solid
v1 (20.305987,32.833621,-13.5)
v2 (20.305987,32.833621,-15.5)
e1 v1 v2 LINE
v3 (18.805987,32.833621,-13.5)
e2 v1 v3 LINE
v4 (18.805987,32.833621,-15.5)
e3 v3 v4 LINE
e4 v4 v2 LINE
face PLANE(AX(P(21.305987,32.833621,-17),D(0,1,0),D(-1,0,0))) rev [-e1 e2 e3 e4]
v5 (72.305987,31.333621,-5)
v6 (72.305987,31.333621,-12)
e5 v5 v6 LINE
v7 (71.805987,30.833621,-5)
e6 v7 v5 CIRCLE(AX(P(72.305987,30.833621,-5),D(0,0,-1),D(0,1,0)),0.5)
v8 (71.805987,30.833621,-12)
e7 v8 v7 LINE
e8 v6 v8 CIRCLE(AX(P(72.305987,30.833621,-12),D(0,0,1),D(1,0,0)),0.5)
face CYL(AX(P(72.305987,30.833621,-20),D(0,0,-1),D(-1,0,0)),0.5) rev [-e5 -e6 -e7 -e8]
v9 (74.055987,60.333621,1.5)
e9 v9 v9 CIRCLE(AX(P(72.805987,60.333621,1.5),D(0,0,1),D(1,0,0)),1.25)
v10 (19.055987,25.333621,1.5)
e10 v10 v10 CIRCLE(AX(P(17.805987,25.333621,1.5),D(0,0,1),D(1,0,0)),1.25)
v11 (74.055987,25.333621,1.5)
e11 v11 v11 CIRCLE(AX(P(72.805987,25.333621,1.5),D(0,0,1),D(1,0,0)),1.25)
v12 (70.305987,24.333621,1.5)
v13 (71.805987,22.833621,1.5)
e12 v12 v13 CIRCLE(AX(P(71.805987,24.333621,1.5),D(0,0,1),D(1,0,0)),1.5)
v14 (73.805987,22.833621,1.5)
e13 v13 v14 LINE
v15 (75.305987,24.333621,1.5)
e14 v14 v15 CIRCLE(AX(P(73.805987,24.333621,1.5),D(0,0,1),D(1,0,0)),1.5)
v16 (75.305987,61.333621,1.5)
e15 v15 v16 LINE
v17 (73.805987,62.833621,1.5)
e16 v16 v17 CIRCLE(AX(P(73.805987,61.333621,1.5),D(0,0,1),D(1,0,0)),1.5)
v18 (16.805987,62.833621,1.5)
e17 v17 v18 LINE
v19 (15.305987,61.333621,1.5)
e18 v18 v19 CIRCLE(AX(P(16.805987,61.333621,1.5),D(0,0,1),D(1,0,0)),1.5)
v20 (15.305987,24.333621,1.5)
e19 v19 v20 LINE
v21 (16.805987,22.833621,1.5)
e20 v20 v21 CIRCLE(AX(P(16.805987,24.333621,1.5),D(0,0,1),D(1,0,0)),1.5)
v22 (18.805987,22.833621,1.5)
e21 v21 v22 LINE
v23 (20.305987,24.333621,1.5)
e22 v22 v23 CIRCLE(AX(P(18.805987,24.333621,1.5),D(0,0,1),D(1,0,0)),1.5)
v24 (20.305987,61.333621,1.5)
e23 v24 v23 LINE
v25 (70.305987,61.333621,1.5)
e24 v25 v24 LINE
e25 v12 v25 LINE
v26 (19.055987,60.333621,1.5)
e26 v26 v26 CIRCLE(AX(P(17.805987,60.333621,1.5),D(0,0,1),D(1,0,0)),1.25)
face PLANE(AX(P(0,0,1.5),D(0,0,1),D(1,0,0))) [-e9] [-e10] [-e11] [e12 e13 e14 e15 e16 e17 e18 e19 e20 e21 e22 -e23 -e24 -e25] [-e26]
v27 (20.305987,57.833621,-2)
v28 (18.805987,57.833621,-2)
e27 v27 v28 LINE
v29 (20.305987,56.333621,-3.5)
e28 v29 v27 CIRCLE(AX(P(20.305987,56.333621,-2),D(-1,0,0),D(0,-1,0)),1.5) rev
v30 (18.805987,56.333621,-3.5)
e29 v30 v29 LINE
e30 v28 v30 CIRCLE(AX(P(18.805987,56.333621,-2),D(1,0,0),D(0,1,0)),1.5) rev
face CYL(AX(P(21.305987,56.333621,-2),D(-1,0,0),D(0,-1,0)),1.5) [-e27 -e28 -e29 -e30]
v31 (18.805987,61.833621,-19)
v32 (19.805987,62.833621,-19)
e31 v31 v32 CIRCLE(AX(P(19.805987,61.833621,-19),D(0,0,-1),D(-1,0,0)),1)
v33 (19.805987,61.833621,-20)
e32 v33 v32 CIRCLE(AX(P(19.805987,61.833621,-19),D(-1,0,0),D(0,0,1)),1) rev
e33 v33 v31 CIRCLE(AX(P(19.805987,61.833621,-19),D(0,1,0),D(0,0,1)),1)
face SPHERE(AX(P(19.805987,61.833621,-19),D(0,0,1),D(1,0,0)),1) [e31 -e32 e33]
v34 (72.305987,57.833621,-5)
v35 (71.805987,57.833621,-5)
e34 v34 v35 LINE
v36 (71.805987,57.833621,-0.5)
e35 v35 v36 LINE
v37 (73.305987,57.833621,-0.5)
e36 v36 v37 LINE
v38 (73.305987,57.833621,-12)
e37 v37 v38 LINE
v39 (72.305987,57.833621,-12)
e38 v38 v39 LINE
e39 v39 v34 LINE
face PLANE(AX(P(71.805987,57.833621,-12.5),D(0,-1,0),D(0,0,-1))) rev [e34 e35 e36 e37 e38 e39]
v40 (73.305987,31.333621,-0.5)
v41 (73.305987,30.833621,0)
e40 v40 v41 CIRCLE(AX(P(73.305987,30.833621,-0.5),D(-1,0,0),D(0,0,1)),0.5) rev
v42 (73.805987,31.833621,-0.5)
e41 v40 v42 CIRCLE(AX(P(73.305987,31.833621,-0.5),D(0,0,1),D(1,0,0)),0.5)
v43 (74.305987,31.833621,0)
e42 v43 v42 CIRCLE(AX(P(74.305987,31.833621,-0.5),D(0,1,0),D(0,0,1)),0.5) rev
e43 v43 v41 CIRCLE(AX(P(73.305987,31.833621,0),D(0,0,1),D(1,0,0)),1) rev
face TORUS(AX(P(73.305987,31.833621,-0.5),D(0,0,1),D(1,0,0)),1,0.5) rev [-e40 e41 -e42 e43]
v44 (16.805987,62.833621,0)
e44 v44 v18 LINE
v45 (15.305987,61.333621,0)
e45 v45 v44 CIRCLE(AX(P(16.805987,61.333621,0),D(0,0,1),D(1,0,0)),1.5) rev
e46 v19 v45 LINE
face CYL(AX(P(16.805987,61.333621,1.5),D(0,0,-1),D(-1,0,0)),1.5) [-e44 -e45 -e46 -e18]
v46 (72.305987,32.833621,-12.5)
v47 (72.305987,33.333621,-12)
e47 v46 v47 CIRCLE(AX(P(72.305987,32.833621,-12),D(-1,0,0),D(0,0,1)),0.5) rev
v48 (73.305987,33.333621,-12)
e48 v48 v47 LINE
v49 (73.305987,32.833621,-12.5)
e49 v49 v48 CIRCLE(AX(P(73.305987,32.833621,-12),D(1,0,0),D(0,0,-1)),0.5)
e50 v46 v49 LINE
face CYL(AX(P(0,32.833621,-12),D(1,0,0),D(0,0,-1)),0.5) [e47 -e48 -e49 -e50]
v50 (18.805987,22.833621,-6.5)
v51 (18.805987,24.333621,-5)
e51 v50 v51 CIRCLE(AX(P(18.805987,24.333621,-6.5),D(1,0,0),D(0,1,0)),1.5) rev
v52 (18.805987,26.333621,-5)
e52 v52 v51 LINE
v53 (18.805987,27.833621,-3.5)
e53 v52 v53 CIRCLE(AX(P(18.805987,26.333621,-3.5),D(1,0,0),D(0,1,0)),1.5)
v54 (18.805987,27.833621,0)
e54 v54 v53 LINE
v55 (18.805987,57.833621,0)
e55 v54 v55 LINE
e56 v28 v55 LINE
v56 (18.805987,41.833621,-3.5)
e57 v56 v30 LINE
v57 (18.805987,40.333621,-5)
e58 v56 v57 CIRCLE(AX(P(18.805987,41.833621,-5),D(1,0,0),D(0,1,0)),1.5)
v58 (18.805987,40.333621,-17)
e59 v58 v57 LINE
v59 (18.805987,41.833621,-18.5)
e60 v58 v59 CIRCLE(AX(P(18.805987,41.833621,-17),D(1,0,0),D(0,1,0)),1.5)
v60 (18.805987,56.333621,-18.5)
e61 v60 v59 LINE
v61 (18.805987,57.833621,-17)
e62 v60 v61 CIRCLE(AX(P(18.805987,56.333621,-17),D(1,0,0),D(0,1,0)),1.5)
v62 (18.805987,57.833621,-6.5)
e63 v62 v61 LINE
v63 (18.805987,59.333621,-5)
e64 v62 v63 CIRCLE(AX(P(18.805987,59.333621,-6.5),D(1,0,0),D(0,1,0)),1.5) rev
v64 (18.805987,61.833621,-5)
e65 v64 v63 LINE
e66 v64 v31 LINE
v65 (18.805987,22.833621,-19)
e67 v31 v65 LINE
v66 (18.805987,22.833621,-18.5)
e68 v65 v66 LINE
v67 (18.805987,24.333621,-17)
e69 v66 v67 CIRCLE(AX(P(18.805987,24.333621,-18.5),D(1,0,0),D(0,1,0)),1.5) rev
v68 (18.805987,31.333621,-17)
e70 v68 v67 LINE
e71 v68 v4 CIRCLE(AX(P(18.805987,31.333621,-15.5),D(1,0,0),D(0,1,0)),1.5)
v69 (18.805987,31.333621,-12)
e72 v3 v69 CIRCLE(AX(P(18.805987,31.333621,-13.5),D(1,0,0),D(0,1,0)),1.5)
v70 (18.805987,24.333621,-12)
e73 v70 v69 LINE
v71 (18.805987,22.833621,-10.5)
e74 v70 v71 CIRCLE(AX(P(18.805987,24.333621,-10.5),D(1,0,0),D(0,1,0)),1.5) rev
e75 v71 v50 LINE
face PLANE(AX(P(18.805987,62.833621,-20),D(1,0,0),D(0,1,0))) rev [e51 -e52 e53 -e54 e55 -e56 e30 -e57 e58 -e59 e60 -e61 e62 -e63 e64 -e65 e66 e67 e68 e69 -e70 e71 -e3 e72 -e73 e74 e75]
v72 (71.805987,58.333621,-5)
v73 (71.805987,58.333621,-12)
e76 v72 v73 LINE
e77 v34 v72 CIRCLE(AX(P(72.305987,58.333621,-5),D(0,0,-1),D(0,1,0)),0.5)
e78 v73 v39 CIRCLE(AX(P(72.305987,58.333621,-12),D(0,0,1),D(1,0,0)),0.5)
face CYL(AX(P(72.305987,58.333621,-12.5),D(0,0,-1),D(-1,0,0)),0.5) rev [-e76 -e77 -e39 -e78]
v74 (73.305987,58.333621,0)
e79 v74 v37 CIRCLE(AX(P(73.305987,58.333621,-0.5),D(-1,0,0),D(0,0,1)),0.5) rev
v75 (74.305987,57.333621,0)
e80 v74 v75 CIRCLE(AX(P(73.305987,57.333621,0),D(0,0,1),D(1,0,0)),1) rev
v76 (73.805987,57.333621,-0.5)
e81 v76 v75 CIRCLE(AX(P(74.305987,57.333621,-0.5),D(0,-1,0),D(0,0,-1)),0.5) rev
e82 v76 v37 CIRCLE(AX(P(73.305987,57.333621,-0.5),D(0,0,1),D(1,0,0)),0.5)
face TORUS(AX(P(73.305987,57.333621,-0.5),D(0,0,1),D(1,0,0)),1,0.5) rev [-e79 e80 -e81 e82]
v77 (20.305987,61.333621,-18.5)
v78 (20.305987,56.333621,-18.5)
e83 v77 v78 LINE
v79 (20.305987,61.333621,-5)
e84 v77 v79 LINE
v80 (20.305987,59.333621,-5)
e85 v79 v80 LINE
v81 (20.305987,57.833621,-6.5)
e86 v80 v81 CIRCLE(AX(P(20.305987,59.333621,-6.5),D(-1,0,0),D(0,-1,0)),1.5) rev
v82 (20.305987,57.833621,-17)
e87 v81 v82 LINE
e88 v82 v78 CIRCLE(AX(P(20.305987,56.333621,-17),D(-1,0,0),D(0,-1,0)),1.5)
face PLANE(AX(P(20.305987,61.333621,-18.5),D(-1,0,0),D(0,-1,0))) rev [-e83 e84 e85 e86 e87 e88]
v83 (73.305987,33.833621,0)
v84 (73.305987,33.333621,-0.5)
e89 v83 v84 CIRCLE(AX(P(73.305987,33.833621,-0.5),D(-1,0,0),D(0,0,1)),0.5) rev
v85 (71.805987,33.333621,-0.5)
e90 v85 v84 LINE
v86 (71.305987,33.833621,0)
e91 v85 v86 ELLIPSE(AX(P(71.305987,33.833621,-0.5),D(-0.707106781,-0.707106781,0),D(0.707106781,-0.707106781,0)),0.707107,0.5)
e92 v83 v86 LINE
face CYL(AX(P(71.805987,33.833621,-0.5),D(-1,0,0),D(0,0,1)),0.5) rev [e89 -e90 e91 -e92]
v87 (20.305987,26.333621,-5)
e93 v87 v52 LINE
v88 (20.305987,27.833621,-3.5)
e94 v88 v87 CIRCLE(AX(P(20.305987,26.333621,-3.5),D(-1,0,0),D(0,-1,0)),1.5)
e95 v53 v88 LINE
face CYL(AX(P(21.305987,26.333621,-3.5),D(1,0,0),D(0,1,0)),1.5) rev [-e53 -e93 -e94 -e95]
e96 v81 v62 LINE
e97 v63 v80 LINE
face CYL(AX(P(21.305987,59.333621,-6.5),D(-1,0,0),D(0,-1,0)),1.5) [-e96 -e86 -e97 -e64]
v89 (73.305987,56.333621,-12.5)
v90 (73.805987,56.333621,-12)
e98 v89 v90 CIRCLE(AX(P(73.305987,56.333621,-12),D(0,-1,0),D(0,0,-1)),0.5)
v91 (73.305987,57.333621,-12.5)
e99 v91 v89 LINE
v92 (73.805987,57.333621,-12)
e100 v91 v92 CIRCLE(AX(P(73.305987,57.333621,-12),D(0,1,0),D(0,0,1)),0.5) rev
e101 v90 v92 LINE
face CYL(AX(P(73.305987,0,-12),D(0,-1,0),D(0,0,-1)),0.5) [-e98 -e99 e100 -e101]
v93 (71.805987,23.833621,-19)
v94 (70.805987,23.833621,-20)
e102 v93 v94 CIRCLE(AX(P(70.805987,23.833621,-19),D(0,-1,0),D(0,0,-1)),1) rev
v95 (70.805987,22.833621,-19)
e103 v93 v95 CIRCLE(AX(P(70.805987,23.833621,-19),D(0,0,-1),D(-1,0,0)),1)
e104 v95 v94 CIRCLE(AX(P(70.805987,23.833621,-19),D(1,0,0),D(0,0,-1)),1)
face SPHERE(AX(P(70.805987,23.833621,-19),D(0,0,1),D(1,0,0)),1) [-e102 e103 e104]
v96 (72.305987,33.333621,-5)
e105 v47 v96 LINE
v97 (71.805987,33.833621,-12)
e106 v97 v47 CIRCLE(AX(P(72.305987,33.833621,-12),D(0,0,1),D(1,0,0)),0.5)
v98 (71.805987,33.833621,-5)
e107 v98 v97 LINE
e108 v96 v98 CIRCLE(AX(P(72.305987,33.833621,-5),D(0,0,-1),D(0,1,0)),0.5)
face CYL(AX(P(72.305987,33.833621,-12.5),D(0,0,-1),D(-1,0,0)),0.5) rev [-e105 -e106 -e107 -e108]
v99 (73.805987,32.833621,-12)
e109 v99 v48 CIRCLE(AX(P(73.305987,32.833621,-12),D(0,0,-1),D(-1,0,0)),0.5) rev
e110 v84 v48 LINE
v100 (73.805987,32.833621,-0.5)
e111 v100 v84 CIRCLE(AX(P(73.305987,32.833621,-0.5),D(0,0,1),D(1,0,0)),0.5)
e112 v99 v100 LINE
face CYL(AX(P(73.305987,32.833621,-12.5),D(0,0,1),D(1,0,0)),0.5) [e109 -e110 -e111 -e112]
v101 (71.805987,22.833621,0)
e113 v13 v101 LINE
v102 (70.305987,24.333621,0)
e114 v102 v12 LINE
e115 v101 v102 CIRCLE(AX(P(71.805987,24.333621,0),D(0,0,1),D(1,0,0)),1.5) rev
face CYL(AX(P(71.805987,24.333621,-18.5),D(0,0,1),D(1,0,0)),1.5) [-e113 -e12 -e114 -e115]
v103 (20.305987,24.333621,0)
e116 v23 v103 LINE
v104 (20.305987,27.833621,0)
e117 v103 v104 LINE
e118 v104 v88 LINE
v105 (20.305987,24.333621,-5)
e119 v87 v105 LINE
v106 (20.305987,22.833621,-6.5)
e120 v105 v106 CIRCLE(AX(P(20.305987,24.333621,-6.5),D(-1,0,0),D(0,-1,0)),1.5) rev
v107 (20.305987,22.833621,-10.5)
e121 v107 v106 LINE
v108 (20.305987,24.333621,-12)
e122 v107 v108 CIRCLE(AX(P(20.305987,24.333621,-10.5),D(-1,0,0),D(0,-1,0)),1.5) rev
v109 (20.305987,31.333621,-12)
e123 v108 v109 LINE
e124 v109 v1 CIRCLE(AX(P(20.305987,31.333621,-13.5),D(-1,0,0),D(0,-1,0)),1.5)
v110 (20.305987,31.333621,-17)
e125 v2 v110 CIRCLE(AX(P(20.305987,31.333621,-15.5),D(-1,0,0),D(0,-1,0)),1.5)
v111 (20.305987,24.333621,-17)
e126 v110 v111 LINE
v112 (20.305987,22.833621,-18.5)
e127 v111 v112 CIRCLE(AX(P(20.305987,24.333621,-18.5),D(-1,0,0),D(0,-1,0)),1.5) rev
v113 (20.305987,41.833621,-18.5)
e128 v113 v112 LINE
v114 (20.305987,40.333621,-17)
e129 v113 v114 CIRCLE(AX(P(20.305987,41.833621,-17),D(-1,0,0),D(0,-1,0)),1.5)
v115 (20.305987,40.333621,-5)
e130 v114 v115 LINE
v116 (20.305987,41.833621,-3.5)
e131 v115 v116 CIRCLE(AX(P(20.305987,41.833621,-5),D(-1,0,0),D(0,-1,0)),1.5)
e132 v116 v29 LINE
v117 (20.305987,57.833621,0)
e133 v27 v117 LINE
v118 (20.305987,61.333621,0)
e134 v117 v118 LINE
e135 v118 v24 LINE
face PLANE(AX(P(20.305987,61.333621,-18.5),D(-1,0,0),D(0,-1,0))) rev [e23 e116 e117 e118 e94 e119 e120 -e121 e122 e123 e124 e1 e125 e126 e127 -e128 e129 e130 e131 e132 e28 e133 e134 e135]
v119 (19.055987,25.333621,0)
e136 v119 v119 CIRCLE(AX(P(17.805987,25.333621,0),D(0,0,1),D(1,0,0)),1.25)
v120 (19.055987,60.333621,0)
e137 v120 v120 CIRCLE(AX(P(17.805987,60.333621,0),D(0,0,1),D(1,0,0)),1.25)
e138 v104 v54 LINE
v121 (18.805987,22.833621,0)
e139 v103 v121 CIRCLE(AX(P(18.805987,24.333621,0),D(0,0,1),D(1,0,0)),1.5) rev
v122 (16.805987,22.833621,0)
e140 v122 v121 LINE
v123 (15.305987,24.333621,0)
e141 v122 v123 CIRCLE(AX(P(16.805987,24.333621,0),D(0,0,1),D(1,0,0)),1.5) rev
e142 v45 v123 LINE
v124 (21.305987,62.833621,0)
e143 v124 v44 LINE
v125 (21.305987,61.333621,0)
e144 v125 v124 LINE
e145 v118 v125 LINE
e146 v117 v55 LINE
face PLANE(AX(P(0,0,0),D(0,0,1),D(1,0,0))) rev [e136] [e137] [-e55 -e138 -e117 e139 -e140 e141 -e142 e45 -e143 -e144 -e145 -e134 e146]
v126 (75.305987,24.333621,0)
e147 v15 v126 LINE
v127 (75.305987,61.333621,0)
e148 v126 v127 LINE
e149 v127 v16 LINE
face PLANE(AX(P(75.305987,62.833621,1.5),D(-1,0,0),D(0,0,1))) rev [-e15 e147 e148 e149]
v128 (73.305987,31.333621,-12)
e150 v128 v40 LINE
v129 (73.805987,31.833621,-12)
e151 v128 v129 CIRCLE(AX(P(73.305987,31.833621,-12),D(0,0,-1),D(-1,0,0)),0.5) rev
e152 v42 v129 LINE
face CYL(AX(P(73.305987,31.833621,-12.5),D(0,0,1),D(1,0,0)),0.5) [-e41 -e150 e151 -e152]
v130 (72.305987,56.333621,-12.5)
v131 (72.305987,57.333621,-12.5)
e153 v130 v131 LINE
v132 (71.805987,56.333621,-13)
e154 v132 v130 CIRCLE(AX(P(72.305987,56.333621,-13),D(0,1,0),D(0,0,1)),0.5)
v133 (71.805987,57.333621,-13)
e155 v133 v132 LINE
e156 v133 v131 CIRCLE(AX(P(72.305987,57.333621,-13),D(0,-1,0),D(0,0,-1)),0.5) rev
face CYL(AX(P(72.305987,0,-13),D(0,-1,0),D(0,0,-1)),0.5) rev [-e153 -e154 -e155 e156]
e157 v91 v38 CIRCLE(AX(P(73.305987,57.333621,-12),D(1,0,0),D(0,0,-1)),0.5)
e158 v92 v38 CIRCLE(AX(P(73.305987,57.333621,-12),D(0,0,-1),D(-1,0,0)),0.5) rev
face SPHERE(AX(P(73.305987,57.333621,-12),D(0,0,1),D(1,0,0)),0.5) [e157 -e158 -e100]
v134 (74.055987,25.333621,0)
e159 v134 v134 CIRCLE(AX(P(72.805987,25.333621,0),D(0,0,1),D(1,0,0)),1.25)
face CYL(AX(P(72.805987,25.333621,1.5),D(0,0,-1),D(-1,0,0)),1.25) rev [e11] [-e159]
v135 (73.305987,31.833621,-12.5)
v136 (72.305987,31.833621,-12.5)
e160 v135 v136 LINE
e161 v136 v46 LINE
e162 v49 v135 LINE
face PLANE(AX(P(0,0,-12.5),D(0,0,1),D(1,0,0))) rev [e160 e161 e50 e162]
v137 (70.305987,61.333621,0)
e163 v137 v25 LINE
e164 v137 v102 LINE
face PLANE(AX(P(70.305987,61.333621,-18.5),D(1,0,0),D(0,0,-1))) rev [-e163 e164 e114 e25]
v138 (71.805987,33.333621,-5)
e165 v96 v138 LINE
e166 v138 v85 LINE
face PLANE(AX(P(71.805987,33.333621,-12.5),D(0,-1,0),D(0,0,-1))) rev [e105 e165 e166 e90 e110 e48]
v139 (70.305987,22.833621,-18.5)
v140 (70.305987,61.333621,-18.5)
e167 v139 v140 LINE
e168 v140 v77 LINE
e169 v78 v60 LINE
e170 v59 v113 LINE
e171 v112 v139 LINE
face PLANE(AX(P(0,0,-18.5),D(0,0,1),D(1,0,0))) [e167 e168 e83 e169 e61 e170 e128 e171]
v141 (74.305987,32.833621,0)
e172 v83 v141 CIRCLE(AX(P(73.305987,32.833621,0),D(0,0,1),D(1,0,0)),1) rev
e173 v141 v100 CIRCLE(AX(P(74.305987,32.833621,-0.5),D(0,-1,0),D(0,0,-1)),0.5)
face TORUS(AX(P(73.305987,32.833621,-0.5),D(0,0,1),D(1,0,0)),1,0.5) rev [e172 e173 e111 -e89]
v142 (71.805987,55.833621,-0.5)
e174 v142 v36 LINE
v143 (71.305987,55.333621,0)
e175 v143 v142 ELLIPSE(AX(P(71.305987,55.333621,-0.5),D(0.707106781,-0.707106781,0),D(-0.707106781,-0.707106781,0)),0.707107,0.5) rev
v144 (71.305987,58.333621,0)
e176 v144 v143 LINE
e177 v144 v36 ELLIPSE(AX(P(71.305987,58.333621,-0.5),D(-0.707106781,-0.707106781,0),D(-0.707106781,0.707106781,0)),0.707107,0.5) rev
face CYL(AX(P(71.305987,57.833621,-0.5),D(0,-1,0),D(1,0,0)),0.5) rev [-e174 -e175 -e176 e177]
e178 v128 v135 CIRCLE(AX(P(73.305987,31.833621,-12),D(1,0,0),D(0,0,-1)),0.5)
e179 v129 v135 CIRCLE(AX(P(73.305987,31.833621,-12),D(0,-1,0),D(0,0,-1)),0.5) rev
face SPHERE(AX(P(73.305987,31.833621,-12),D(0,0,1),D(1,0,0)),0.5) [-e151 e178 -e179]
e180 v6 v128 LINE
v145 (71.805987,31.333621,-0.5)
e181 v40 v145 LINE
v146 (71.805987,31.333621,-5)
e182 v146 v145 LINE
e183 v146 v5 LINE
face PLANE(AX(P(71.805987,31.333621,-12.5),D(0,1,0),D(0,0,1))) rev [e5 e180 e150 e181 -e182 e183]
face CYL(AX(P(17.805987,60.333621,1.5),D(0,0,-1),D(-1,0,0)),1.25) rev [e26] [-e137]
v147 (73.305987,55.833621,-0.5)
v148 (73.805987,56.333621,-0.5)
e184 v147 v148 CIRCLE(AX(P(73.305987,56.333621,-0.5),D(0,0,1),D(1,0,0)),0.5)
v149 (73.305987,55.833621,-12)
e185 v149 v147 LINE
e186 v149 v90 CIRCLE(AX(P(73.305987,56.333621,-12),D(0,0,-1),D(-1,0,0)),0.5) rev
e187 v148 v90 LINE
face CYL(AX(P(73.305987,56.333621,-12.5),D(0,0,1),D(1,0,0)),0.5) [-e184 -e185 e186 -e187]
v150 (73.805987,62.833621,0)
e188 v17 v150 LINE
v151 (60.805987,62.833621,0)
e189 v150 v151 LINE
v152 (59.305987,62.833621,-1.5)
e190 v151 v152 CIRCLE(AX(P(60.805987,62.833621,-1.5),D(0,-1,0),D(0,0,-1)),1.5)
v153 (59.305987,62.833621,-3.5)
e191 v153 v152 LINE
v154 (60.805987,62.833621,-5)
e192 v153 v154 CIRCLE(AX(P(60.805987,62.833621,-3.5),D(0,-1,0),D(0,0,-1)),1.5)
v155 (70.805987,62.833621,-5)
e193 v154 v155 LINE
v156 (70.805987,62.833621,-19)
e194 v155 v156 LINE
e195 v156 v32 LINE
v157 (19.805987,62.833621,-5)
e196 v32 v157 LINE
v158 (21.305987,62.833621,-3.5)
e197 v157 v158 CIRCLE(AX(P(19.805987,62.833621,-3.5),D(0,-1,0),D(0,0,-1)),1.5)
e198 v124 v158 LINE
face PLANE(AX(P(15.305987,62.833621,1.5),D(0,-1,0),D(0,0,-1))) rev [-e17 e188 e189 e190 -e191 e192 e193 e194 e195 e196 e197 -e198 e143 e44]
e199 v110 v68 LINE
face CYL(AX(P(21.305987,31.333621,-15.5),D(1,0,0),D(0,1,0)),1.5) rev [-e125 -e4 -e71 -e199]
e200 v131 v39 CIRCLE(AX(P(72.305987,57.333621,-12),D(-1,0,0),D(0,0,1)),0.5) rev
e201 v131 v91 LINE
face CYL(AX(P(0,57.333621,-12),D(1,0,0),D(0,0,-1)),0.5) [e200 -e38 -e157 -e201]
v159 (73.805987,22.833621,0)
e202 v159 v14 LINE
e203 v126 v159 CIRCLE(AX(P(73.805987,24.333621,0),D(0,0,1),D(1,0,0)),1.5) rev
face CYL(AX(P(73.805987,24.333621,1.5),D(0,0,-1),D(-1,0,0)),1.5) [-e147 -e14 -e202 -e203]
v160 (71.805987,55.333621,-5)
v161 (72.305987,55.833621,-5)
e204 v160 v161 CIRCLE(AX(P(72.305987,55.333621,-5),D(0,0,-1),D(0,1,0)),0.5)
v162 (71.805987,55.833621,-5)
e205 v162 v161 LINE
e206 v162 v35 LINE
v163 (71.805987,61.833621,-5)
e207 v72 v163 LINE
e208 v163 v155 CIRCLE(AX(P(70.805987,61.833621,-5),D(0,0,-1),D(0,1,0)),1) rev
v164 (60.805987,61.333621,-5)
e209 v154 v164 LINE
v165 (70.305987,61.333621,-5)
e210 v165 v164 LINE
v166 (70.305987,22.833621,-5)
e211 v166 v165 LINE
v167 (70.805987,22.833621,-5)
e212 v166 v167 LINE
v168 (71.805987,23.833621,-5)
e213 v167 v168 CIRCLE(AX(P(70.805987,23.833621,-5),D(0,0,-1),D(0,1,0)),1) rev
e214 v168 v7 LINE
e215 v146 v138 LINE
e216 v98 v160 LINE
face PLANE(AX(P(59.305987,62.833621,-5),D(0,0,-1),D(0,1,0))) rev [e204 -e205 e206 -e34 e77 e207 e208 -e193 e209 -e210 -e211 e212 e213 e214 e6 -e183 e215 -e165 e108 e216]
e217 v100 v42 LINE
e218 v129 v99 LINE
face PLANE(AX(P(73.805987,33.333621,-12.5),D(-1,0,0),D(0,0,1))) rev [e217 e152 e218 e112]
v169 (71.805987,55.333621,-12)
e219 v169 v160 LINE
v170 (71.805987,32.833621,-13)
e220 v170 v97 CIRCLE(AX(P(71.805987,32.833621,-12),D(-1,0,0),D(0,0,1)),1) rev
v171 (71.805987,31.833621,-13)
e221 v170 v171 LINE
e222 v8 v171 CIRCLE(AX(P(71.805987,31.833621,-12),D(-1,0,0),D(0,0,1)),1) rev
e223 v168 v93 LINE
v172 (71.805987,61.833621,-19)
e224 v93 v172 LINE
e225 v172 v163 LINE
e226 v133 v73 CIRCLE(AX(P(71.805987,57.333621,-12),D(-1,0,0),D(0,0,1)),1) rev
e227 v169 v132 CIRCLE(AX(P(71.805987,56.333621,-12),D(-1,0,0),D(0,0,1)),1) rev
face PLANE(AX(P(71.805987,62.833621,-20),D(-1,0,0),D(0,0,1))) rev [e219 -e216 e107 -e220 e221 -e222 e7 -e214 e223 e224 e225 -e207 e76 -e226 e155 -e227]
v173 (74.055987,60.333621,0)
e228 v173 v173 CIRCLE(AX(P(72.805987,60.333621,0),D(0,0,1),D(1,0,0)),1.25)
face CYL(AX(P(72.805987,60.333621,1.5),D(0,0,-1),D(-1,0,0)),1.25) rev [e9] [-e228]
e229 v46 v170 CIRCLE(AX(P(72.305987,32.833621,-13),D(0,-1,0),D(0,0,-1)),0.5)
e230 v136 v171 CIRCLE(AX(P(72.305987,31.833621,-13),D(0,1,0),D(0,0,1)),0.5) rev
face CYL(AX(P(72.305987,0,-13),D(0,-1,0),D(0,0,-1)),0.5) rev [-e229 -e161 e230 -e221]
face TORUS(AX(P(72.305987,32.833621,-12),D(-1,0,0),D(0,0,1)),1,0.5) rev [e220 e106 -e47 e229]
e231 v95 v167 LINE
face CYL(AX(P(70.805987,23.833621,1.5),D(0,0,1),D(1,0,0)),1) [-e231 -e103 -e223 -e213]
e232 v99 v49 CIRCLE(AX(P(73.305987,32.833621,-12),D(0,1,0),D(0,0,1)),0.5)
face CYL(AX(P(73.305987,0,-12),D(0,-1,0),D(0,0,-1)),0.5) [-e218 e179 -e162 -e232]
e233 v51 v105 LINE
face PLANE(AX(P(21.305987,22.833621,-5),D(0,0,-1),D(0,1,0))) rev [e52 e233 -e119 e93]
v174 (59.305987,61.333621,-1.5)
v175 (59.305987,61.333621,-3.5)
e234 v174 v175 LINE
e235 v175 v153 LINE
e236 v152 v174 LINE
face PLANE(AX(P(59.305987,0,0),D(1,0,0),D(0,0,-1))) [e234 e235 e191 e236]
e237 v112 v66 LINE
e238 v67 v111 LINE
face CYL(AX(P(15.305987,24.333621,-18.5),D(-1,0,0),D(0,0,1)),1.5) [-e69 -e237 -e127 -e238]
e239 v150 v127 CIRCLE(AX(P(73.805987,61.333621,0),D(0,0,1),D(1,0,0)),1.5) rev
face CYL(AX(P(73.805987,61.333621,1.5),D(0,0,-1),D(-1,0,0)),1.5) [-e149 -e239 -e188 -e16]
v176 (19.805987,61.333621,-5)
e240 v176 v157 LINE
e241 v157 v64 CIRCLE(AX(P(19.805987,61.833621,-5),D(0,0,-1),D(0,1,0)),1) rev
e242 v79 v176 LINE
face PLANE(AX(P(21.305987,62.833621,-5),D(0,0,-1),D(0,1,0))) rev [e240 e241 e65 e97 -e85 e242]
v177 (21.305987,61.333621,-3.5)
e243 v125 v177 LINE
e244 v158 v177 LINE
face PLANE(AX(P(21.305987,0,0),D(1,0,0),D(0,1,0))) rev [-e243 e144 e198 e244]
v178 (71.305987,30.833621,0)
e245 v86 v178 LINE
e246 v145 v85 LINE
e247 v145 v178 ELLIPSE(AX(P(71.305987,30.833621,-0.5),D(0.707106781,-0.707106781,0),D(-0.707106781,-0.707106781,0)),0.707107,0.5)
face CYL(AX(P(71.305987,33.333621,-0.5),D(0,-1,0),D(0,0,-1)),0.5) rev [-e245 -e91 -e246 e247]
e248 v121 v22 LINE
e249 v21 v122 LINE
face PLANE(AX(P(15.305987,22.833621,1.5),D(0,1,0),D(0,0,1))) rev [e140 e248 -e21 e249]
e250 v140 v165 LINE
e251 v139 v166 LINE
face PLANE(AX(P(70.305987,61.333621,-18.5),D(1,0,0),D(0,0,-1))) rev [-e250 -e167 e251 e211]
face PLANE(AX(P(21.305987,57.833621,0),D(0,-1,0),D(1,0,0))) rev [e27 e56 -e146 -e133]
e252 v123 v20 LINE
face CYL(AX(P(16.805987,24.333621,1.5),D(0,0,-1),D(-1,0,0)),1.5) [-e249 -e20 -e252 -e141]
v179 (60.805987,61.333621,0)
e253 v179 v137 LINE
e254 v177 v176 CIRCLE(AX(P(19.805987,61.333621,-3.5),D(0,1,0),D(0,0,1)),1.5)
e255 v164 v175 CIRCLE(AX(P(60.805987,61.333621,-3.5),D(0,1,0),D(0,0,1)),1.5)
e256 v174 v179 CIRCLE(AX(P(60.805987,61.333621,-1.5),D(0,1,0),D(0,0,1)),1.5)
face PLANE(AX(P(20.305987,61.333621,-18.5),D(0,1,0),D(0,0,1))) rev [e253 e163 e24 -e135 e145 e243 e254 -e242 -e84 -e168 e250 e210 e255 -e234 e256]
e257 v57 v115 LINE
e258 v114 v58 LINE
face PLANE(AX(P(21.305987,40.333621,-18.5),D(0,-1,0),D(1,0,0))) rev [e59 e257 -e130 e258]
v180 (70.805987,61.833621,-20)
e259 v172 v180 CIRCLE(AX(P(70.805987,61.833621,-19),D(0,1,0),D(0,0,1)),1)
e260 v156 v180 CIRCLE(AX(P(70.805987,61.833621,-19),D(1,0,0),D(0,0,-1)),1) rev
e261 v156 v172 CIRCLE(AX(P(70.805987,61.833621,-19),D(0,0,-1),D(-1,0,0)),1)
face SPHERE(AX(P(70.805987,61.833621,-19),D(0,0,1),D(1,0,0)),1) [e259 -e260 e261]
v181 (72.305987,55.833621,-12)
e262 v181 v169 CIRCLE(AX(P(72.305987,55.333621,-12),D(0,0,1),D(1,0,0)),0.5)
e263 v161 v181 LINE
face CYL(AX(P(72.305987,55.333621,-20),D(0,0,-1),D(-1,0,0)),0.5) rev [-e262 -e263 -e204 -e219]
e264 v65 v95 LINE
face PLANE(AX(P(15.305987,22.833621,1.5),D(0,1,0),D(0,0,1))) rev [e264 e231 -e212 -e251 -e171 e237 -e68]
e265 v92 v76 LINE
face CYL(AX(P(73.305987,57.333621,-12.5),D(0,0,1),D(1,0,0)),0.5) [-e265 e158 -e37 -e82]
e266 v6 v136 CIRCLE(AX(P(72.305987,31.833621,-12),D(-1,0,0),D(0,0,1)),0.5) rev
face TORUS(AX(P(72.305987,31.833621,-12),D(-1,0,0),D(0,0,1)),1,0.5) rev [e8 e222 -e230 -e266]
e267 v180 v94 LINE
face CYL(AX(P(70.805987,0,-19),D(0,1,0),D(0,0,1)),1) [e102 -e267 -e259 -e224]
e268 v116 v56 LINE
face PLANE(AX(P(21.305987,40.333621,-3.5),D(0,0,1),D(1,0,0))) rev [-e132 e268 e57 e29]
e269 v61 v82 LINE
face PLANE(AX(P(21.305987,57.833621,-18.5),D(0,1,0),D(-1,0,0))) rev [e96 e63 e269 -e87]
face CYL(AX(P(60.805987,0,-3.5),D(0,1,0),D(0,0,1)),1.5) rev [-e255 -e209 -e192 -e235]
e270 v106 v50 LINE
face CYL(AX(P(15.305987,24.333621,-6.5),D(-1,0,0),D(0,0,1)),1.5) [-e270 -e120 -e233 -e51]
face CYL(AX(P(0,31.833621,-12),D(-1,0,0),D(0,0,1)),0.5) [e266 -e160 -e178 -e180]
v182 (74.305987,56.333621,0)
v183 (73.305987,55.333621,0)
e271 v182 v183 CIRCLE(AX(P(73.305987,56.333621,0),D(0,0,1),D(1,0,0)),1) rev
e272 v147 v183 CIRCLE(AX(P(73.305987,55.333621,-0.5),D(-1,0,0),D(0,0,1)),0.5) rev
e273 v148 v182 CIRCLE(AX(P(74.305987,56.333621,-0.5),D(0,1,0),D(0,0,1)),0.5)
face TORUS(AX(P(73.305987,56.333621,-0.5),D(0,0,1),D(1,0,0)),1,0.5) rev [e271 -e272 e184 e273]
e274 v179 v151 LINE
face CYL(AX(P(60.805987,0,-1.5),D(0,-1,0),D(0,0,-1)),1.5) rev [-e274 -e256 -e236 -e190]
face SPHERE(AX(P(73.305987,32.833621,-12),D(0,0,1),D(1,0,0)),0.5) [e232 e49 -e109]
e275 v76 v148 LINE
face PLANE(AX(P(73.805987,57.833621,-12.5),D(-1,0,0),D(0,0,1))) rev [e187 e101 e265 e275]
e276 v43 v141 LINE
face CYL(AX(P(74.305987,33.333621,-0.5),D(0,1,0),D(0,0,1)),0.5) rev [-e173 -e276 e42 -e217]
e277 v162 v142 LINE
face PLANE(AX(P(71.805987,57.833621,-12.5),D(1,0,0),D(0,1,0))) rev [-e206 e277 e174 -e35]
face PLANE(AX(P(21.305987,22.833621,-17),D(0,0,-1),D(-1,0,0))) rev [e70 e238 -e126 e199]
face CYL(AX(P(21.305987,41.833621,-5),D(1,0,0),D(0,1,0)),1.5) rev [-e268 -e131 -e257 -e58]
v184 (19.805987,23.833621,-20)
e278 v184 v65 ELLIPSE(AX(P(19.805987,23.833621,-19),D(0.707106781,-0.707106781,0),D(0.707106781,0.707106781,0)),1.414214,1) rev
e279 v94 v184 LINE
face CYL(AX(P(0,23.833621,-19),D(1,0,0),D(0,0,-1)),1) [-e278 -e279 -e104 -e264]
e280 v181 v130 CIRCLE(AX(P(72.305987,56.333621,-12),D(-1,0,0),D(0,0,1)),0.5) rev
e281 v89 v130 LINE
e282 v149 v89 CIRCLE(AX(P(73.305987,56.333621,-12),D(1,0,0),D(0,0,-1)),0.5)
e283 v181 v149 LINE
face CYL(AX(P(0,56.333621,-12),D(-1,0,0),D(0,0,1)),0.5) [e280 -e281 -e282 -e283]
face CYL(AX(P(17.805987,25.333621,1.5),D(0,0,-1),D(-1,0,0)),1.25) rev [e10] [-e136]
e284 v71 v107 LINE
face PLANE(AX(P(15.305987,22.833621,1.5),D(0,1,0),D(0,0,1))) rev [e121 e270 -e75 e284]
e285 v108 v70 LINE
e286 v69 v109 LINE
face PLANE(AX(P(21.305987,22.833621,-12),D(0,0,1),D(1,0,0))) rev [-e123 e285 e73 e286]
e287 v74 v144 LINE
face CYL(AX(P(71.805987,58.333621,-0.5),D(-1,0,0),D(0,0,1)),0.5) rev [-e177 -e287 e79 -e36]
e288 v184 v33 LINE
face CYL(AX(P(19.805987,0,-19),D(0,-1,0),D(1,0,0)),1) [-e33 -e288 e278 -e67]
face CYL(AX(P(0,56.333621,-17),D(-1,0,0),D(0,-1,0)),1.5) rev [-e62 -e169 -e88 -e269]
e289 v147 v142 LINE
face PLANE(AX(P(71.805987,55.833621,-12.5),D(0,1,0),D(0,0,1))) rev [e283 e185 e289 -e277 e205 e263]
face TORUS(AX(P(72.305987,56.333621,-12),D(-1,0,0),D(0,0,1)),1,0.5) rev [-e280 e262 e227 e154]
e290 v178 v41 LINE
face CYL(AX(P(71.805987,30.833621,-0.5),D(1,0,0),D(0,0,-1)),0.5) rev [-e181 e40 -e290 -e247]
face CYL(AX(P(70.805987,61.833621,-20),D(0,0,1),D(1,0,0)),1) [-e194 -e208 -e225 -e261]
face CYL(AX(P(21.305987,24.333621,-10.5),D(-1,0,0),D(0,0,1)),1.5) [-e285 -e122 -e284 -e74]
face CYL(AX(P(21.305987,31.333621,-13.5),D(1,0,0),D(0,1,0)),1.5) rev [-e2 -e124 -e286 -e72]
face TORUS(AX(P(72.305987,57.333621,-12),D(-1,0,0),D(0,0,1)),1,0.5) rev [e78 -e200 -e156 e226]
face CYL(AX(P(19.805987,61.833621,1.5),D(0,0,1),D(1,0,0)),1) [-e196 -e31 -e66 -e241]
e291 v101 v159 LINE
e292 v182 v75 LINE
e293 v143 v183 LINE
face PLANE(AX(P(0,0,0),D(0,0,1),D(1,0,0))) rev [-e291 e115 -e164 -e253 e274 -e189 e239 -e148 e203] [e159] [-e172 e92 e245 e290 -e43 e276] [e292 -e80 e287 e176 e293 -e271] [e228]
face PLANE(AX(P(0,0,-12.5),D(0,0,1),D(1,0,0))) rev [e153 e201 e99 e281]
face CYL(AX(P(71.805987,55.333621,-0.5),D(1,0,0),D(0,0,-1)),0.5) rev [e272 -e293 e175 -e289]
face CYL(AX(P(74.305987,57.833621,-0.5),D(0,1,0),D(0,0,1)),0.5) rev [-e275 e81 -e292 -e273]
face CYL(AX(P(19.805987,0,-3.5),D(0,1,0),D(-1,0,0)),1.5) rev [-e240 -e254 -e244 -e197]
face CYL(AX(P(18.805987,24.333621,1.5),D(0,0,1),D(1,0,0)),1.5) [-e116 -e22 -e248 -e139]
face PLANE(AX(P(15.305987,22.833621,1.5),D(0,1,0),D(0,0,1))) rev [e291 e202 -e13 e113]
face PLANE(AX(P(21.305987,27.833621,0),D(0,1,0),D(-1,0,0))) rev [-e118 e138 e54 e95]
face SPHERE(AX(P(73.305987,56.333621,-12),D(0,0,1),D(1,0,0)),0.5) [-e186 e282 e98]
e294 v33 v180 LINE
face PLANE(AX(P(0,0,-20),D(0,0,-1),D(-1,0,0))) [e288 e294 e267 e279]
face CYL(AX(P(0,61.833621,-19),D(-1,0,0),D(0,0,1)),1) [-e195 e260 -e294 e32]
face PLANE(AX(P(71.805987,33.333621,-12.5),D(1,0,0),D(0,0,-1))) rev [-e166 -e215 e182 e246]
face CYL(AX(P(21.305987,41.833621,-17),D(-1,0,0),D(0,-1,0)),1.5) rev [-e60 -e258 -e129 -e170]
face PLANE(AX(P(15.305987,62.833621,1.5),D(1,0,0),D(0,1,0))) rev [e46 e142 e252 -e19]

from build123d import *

# Parameters (mm, degrees)
SKETCH2_W           = 60
SKETCH2_H           = 40
SKETCH2_R           = 1.25
BOSS_EXTRUDE3_DEPTH = 1.5
SKETCH3_W           = 53
SKETCH3_H           = 40
BOSS_EXTRUDE4_DEPTH = 20
SKETCH7_W           = 50
SKETCH7_H           = 38.5
CUT_EXTRUDE4_DEPTH  = 20
SKETCH8_W           = 5
SKETCH8_H           = 40
CUT_EXTRUDE5_DEPTH  = 12.5
SKETCH11_W          = 5
SKETCH11_H          = 5
CUT_EXTRUDE8_DEPTH  = 2.5
SKETCH17_W          = 15
SKETCH17_H          = 17.5
SKETCH17_W_2        = 5
SKETCH17_H_2        = 10
CUT_EXTRUDE13_DEPTH = 2.5
SKETCH19_W          = 2
SKETCH19_H          = 2
BOSS_EXTRUDE5_DEPTH = 12.5
FILLET1_R           = 1.5
FILLET2_R           = 1.5
FILLET3_R           = 1
FILLET4_R           = 0.5
FILLET5_R           = 1.5


with BuildPart() as part:
    # Sketch2 → Boss-Extrude3 (new body)
    with BuildSketch(Plane.XY):
        with Locations((45.305986755, 42.83362131)):
            Rectangle(SKETCH2_W, SKETCH2_H)
        with Locations((17.805986755, 60.33362131)):
            Circle(SKETCH2_R, mode=Mode.SUBTRACT)
        with Locations((17.805986755, 25.33362131)):
            Circle(SKETCH2_R, mode=Mode.SUBTRACT)
        with Locations((72.805986755, 25.33362131)):
            Circle(SKETCH2_R, mode=Mode.SUBTRACT)
        with Locations((72.805986755, 60.33362131)):
            Circle(SKETCH2_R, mode=Mode.SUBTRACT)
    extrude(amount=BOSS_EXTRUDE3_DEPTH)

    # Sketch3 → Boss-Extrude4 (add)
    with BuildSketch(Plane(origin=(0, 0, 0), x_dir=(-1, 0, 0), z_dir=(0, 0, -1))):
        with Locations((-45.305986755, 42.83362131)):
            Rectangle(SKETCH3_W, SKETCH3_H)
    extrude(amount=BOSS_EXTRUDE4_DEPTH)

    # Sketch7 → Cut-Extrude4 (cut)
    with BuildSketch(Plane.XY.offset(1.5)):
        with Locations((45.305986755, 42.08362131)):
            Rectangle(SKETCH7_W, SKETCH7_H)
    extrude(amount=-CUT_EXTRUDE4_DEPTH, mode=Mode.SUBTRACT)

    # Sketch8 → Cut-Extrude5 (cut)
    with BuildSketch(Plane(origin=(71.805986755, 0, 0), x_dir=(0, 0, -1), z_dir=(1, 0, 0))):
        with Locations((2.5, 42.83362131)):
            Rectangle(SKETCH8_W, SKETCH8_H)
    extrude(amount=-CUT_EXTRUDE5_DEPTH, mode=Mode.SUBTRACT)

    # Sketch11 → Cut-Extrude8 (cut)
    with BuildSketch(Plane.ZY.offset(-18.805986755)):
        with Locations((-2.5, 60.33362131)):
            Rectangle(SKETCH11_W, SKETCH11_H)
        with Locations((-2.5, 25.33362131)):
            Rectangle(SKETCH11_W, SKETCH11_H)
    extrude(amount=-CUT_EXTRUDE8_DEPTH, mode=Mode.SUBTRACT)

    # Sketch17 → Cut-Extrude13 (cut)
    with BuildSketch(Plane.ZY.offset(-18.805986755)):
        with Locations((-11, 49.08362131)):
            Rectangle(SKETCH17_W, SKETCH17_H)
        with Locations((-14.5, 27.83362131)):
            Rectangle(SKETCH17_W_2, SKETCH17_H_2)
    extrude(amount=-CUT_EXTRUDE13_DEPTH, mode=Mode.SUBTRACT)

    # Sketch19 → Boss-Extrude5 (add)
    with BuildSketch(Plane(origin=(0, 0, 0), x_dir=(-1, 0, 0), z_dir=(0, 0, -1))):
        with Locations((-72.805986755, 32.33362131)):
            Rectangle(SKETCH19_W, SKETCH19_H)
        with Locations((-72.805986755, 56.83362131)):
            Rectangle(SKETCH19_W, SKETCH19_H)
    extrude(amount=BOSS_EXTRUDE5_DEPTH)

    # Fillet1
    fillet1_edges = [part.edges().sort_by_distance(p)[0] for p in [
        (70.305986755, 22.83362131, 0.75),
        (15.305986755, 62.83362131, 0.75),
        (75.305986755, 62.83362131, 0.75),
        (75.305986755, 22.83362131, 0.75),
        (15.305986755, 22.83362131, 0.75),
        (20.305986755, 22.83362131, 0.75),
    ]]
    fillet(fillet1_edges, radius=FILLET1_R)

    # Fillet2
    fillet2_edges = [part.edges().sort_by_distance(p)[0] for p in [
        (19.555986755, 57.83362131, -5),
        (19.555986755, 22.83362131, -5),
        (19.555986755, 27.83362131, -5),
        (19.555986755, 40.33362131, -18.5),
        (19.555986755, 40.33362131, -3.5),
        (19.555986755, 57.83362131, -3.5),
        (19.555986755, 57.83362131, -18.5),
        (19.555986755, 22.83362131, -17),
        (19.555986755, 32.83362131, -17),
        (19.555986755, 32.83362131, -12),
        (19.555986755, 22.83362131, -12),
        (59.305986755, 62.08362131, 0),
        (59.305986755, 62.08362131, -5),
    ]]
    fillet(fillet2_edges, radius=FILLET2_R)

    # Fillet3
    fillet3_edges = [part.edges().sort_by_distance(p)[0] for p in [
        (71.805986755, 62.83362131, -12.5),
        (71.805986755, 22.83362131, -12.5),
        (18.805986755, 62.83362131, -12.5),
        (71.805986755, 42.83362131, -20),
        (45.305986755, 22.83362131, -20),
        (18.805986755, 42.83362131, -20),
        (45.305986755, 62.83362131, -20),
    ]]
    fillet(fillet3_edges, radius=FILLET3_R)

    # Fillet4
    fillet4_edges = [part.edges().sort_by_distance(p)[0] for p in [
        (72.805986755, 55.83362131, 0),
        (72.805986755, 33.33362131, 0),
        (72.805986755, 31.33362131, 0),
        (73.805986755, 56.83362131, 0),
        (71.805986755, 32.33362131, 0),
        (73.805986755, 32.33362131, 0),
        (71.805986755, 56.83362131, 0),
        (72.805986755, 57.83362131, 0),
        (71.805986755, 32.33362131, -12.5),
        (71.805986755, 56.83362131, -12.5),
        (71.805986755, 33.33362131, -8.75),
        (71.805986755, 57.83362131, -8.75),
        (71.805986755, 55.83362131, -8.75),
        (73.805986755, 57.83362131, -6.25),
        (73.805986755, 33.33362131, -6.25),
        (71.805986755, 31.33362131, -8.75),
        (73.805986755, 31.33362131, -6.25),
        (73.805986755, 55.83362131, -6.25),
        (72.805986755, 55.83362131, -12.5),
        (73.805986755, 56.83362131, -12.5),
        (72.805986755, 57.83362131, -12.5),
        (72.805986755, 31.33362131, -12.5),
        (73.805986755, 32.33362131, -12.5),
        (72.805986755, 33.33362131, -12.5),
    ]]
    fillet(fillet4_edges, radius=FILLET4_R)

    # Fillet5
    # the kernel refuses this fillet: 1.5 mm, written as the material it adds along each edge
    with BuildSketch(Plane(origin=(21.305986755, 62.83362131, -5), x_dir=(-1, 0, 0), z_dir=(0, -1, 0))) as fillet5_piece_1:
        with BuildLine():
            CenterArc((FILLET5_R, -FILLET5_R), FILLET5_R, 90, 90)
            Line((0, -FILLET5_R), (0, 0))
            Line((0, 0), (FILLET5_R, 0))
        make_face()
    extrude(amount=1.5)


solid = part.part
